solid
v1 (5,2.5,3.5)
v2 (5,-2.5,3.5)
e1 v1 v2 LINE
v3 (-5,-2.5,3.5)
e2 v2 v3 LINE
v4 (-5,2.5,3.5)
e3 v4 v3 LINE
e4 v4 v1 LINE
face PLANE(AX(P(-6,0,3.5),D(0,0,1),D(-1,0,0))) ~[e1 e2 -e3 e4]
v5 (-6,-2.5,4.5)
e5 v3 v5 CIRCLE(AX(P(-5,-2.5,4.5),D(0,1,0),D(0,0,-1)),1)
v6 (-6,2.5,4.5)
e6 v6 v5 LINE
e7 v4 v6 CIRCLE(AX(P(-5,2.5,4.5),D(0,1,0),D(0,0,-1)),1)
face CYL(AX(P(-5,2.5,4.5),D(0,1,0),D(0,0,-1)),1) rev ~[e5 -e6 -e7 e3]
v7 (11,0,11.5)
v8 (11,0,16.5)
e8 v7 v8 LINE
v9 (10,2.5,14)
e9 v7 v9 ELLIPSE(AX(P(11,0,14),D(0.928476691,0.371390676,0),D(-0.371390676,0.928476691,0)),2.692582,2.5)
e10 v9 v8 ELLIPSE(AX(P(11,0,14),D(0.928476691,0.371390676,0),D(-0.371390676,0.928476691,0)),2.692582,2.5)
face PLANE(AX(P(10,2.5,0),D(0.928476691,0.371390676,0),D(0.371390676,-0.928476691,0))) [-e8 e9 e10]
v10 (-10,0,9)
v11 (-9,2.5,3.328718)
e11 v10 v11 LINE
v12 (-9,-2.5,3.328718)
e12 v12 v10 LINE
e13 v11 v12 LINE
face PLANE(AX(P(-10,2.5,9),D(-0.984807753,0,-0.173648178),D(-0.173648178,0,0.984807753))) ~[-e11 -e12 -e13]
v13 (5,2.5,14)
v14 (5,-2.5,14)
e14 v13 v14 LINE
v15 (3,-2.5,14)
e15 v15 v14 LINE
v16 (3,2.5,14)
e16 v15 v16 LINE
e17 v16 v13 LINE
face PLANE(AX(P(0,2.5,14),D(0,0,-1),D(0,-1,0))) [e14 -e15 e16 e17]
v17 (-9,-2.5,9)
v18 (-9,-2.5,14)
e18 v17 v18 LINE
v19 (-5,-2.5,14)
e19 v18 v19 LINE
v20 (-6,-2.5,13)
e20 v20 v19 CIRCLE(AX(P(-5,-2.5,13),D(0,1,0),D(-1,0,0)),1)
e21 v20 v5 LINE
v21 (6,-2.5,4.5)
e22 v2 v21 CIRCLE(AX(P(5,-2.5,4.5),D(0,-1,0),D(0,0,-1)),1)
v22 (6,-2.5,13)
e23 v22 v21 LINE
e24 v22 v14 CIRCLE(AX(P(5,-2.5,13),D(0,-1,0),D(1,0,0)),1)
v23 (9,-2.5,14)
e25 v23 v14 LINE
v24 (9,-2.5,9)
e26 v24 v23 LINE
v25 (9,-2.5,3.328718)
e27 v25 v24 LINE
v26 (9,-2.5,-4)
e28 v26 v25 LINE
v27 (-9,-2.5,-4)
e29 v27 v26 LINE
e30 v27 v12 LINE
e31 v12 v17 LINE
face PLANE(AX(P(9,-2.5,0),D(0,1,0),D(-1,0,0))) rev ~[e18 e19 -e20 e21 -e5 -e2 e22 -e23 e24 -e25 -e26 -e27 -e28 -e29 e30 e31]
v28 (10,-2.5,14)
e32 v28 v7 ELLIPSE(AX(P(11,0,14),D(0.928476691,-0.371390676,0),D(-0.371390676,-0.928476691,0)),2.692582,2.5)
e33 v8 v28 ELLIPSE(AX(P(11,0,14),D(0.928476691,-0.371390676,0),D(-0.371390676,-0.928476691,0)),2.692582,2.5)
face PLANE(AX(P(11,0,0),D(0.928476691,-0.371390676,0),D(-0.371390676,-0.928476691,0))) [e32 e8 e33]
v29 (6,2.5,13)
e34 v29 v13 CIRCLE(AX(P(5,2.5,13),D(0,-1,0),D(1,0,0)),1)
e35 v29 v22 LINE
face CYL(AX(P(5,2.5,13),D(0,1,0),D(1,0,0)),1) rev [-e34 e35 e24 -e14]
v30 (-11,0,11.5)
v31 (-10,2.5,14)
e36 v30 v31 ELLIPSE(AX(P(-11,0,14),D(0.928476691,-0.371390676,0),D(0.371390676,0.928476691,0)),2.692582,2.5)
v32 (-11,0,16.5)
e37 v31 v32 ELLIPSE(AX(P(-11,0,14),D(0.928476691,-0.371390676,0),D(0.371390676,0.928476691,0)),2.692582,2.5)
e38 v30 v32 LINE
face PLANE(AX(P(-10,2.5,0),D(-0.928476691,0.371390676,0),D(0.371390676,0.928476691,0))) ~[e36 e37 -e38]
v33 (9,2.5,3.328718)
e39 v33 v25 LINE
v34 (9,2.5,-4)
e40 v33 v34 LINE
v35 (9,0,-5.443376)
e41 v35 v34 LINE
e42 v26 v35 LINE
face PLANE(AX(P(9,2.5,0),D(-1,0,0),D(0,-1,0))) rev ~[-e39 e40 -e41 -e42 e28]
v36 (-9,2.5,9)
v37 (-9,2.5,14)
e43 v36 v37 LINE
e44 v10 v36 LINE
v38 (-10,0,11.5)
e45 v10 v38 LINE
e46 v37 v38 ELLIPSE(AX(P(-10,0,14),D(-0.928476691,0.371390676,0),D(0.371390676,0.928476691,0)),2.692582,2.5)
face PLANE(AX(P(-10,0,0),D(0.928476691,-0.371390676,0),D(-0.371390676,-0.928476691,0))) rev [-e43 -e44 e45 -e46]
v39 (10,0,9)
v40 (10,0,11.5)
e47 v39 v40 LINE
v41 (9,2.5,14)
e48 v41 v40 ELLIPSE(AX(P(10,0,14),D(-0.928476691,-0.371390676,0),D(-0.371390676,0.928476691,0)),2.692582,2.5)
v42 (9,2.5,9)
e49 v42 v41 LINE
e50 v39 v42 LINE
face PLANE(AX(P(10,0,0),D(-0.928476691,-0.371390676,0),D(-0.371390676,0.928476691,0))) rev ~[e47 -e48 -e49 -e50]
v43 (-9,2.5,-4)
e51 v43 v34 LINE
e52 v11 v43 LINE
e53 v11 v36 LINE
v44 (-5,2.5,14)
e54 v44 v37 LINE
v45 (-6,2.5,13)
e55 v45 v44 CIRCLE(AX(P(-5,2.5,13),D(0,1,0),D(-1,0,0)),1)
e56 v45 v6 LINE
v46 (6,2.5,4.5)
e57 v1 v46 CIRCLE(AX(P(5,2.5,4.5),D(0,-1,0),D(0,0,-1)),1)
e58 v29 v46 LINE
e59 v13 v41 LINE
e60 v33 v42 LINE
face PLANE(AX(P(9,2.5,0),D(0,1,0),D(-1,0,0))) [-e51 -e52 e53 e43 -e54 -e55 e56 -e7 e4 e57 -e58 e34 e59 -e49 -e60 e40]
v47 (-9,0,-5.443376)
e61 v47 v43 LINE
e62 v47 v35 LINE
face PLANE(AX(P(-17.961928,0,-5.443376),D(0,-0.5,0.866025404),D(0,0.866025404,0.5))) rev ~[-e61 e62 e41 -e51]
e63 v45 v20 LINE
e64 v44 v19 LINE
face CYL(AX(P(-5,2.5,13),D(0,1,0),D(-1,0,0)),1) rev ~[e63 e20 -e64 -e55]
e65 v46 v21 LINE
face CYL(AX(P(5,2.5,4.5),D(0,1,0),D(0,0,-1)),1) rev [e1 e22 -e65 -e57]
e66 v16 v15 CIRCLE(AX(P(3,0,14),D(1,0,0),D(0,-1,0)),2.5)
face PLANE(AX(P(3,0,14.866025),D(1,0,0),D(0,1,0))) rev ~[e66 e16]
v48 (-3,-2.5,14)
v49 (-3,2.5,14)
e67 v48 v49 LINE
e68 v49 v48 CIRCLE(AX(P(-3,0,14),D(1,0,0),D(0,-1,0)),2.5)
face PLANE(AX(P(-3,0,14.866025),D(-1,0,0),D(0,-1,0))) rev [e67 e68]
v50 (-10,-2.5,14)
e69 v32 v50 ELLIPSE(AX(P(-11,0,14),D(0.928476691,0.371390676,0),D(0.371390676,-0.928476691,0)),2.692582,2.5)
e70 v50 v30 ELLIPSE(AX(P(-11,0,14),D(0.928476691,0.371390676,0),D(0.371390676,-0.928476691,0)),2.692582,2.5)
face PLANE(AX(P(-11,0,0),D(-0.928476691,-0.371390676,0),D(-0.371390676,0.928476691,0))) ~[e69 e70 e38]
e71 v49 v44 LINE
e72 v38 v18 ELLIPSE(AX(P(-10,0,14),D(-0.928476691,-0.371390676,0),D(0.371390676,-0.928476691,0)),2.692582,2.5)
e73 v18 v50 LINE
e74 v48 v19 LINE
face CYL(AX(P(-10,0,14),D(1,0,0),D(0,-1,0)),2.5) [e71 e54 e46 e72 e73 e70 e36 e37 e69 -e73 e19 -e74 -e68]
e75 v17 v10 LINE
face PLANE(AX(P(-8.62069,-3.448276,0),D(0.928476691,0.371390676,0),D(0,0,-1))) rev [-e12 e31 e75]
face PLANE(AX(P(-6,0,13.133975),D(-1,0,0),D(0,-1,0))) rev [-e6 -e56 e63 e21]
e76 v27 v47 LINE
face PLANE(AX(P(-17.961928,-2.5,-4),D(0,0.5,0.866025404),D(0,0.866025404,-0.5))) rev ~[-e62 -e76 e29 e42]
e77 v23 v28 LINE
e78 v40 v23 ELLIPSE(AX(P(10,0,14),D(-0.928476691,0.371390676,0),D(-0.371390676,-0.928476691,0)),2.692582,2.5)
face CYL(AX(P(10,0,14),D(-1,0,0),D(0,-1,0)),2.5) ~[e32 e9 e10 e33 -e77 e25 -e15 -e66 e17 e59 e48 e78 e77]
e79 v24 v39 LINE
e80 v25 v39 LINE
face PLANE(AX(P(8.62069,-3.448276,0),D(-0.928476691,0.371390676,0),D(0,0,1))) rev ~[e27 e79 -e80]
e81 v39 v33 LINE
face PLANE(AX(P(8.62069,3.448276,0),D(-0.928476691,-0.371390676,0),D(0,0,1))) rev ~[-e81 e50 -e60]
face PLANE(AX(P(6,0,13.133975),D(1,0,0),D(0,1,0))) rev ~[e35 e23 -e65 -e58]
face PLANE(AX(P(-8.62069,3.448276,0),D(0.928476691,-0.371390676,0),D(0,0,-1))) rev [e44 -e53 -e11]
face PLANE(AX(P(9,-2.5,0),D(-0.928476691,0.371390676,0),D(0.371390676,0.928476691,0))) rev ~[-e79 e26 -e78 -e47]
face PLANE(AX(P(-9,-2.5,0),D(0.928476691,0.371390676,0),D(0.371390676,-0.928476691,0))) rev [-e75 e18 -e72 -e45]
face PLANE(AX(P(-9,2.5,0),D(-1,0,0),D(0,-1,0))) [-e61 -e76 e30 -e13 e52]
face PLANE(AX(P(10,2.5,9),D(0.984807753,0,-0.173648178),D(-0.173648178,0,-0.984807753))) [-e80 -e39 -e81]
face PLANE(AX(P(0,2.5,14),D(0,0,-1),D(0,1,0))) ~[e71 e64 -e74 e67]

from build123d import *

# Parameters (mm, degrees)
F2_DEPTH     = 2.5
F3_DEPTH     = 10
F4_DEPTH     = 3
F5_DEPTH     = 6
F6_T1_DEPTH  = 5
F8_DEPTH     = 14
F9_DEPTH     = 9
F10_DEPTH    = 1
F11_DEPTH    = 16.5
F12_T4_DEPTH = 5
F14_DEPTH    = 6
F15_T1_DEPTH = 35.9238558823


# Not quite as in the source:
# - a fillet or chamfer that OpenCascade refuses, or shapes differently, is made with other operations: its cross-section is extruded or revolved along the edge and cut away or added


with BuildPart() as f2:
    # F0 (on Front) → F2 (new body, symmetric)
    with BuildSketch(Plane.XZ):
        Polygon((0, 3.5), (0, 0), (9, 0), (9, 14), (6, 14), (6, 3.5), align=None)
    extrude(amount=F2_DEPTH, both=True)

    # F1 (on Right) → F3 (join)
    with BuildSketch(Plane.YZ):
        with BuildLine():
            Line((-2.5, 14), (2.5, 14))
            ThreePointArc((2.5, 14), (0, 16.5), (-2.5, 14))
        make_face()
        with BuildLine():
            ThreePointArc((-2.5, 14), (0, 11.5), (2.5, 14))
            Line((2.5, 14), (-2.5, 14))
        make_face()
    extrude(amount=F3_DEPTH)

    # F1 (on Right) → F4 (cut)
    with BuildSketch(Plane.YZ):
        with BuildLine():
            Line((-2.5, 14), (2.5, 14))
            ThreePointArc((2.5, 14), (0, 16.5), (-2.5, 14))
        make_face()
        with BuildLine():
            ThreePointArc((-2.5, 14), (0, 11.5), (2.5, 14))
            Line((2.5, 14), (-2.5, 14))
        make_face()
    extrude(amount=F4_DEPTH, mode=Mode.SUBTRACT)

    # F1 (on Right) → F5 (cut)
    with BuildSketch(Plane.YZ):
        with BuildLine():
            ThreePointArc((-2.5, 14), (0, 11.5), (2.5, 14))
            Line((2.5, 14), (-2.5, 14))
        make_face()
    extrude(amount=F5_DEPTH, mode=Mode.SUBTRACT)

    # F6: fillet of radius 1 on 2 edges, made by hand

    # F6_s2 → F6_t1 (join)
    with BuildSketch(Plane.XZ.offset(-2.5)):
        with BuildLine():
            ThreePointArc((6, 13), (5.7071067812, 13.7071067812), (5, 14))
            Line((5, 14), (6, 14))
            Line((6, 14), (6, 13))
        make_face()
        with BuildLine():
            ThreePointArc((5, 3.5), (5.7071067812, 3.7928932188), (6, 4.5))
            Line((6, 4.5), (6, 3.5))
            Line((6, 3.5), (5, 3.5))
        make_face()
    extrude(amount=F6_T1_DEPTH)

    # F7 (on Top) → F8 (join)
    with BuildSketch(Plane.XY):
        Polygon((9, 2.5), (9, -2.5), (10, 0), align=None)
    extrude(amount=F8_DEPTH)

    # F7 (on Top) → F9 (cut)
    with BuildSketch(Plane.XY):
        Polygon((9, 2.5), (9, -2.5), (10, 0), align=None)
    extrude(amount=F9_DEPTH, mode=Mode.SUBTRACT)

    # F10 (add): a face of the model
    f10_faces = [f2.faces().sort_by_distance(p)[0] for p in [
        (10, -1.717766953, 12.282233047),
    ]]
    extrude(f10_faces, amount=F10_DEPTH)

    # F7 (on Top) → F11 (cut)
    with BuildSketch(Plane.XY):
        Polygon((11, 0), (10, -2.5), (11.5, -2.5), (11.5, 2.5), (10, 2.5), align=None)
    extrude(amount=F11_DEPTH, mode=Mode.SUBTRACT)

    # F12: chamfer of 1 x 5.6712818196 on 1 edges, made by hand


with BuildPart() as f12_tool2:
    # F12_s3 → F12_t4 (new body)
    with BuildSketch(Plane.XZ.offset(-2.5)):
        Polygon((10, 9), (9, 3.3287181804), (9, 9), align=None)
    extrude(amount=F12_T4_DEPTH)

    split(bisect_by=Plane(origin=(8.6206896552, 3.4482758621, 0), x_dir=(0, 0, 1), z_dir=(-0.9284766909, -0.3713906764, 0)), keep=Keep.TOP)

    split(bisect_by=Plane(origin=(8.6206896552, -3.4482758621, 0), x_dir=(0, 0, 1), z_dir=(-0.9284766909, 0.3713906764, 0)), keep=Keep.TOP)


with BuildPart() as f2_1:
    add(f2.part)

    # F12_t1: union F12_tool2
    add(f12_tool2.part)

    # F13: F2 across face


with BuildPart() as f2_2:
    add(f2_1.part)
    add(f2_1.part.mirror(Plane(origin=(0, 0, 1.75), x_dir=(0, -1, 0), z_dir=(-1, 0, 0))))

    # F14 (add): a face of the model
    f14_faces = [f2_2.faces().sort_by_distance(p)[0] for p in [
        (0, 0, 0),
    ]]
    extrude(f14_faces, amount=F14_DEPTH)

    # F15: chamfer of 2 x 3.4641016151 on 2 edges, made by hand

    # F15_s2 → F15_t1 (cut)
    with BuildSketch(Plane.YZ.offset(-17.9619279412)):
        Polygon((-2.5, -4), (0.9641016151, -6), (-2.5, -6), align=None)
        Polygon((-0.9641016151, -6), (2.5, -4), (2.5, -6), align=None)
    extrude(amount=F15_T1_DEPTH, mode=Mode.SUBTRACT)


solid = f2_2.part
